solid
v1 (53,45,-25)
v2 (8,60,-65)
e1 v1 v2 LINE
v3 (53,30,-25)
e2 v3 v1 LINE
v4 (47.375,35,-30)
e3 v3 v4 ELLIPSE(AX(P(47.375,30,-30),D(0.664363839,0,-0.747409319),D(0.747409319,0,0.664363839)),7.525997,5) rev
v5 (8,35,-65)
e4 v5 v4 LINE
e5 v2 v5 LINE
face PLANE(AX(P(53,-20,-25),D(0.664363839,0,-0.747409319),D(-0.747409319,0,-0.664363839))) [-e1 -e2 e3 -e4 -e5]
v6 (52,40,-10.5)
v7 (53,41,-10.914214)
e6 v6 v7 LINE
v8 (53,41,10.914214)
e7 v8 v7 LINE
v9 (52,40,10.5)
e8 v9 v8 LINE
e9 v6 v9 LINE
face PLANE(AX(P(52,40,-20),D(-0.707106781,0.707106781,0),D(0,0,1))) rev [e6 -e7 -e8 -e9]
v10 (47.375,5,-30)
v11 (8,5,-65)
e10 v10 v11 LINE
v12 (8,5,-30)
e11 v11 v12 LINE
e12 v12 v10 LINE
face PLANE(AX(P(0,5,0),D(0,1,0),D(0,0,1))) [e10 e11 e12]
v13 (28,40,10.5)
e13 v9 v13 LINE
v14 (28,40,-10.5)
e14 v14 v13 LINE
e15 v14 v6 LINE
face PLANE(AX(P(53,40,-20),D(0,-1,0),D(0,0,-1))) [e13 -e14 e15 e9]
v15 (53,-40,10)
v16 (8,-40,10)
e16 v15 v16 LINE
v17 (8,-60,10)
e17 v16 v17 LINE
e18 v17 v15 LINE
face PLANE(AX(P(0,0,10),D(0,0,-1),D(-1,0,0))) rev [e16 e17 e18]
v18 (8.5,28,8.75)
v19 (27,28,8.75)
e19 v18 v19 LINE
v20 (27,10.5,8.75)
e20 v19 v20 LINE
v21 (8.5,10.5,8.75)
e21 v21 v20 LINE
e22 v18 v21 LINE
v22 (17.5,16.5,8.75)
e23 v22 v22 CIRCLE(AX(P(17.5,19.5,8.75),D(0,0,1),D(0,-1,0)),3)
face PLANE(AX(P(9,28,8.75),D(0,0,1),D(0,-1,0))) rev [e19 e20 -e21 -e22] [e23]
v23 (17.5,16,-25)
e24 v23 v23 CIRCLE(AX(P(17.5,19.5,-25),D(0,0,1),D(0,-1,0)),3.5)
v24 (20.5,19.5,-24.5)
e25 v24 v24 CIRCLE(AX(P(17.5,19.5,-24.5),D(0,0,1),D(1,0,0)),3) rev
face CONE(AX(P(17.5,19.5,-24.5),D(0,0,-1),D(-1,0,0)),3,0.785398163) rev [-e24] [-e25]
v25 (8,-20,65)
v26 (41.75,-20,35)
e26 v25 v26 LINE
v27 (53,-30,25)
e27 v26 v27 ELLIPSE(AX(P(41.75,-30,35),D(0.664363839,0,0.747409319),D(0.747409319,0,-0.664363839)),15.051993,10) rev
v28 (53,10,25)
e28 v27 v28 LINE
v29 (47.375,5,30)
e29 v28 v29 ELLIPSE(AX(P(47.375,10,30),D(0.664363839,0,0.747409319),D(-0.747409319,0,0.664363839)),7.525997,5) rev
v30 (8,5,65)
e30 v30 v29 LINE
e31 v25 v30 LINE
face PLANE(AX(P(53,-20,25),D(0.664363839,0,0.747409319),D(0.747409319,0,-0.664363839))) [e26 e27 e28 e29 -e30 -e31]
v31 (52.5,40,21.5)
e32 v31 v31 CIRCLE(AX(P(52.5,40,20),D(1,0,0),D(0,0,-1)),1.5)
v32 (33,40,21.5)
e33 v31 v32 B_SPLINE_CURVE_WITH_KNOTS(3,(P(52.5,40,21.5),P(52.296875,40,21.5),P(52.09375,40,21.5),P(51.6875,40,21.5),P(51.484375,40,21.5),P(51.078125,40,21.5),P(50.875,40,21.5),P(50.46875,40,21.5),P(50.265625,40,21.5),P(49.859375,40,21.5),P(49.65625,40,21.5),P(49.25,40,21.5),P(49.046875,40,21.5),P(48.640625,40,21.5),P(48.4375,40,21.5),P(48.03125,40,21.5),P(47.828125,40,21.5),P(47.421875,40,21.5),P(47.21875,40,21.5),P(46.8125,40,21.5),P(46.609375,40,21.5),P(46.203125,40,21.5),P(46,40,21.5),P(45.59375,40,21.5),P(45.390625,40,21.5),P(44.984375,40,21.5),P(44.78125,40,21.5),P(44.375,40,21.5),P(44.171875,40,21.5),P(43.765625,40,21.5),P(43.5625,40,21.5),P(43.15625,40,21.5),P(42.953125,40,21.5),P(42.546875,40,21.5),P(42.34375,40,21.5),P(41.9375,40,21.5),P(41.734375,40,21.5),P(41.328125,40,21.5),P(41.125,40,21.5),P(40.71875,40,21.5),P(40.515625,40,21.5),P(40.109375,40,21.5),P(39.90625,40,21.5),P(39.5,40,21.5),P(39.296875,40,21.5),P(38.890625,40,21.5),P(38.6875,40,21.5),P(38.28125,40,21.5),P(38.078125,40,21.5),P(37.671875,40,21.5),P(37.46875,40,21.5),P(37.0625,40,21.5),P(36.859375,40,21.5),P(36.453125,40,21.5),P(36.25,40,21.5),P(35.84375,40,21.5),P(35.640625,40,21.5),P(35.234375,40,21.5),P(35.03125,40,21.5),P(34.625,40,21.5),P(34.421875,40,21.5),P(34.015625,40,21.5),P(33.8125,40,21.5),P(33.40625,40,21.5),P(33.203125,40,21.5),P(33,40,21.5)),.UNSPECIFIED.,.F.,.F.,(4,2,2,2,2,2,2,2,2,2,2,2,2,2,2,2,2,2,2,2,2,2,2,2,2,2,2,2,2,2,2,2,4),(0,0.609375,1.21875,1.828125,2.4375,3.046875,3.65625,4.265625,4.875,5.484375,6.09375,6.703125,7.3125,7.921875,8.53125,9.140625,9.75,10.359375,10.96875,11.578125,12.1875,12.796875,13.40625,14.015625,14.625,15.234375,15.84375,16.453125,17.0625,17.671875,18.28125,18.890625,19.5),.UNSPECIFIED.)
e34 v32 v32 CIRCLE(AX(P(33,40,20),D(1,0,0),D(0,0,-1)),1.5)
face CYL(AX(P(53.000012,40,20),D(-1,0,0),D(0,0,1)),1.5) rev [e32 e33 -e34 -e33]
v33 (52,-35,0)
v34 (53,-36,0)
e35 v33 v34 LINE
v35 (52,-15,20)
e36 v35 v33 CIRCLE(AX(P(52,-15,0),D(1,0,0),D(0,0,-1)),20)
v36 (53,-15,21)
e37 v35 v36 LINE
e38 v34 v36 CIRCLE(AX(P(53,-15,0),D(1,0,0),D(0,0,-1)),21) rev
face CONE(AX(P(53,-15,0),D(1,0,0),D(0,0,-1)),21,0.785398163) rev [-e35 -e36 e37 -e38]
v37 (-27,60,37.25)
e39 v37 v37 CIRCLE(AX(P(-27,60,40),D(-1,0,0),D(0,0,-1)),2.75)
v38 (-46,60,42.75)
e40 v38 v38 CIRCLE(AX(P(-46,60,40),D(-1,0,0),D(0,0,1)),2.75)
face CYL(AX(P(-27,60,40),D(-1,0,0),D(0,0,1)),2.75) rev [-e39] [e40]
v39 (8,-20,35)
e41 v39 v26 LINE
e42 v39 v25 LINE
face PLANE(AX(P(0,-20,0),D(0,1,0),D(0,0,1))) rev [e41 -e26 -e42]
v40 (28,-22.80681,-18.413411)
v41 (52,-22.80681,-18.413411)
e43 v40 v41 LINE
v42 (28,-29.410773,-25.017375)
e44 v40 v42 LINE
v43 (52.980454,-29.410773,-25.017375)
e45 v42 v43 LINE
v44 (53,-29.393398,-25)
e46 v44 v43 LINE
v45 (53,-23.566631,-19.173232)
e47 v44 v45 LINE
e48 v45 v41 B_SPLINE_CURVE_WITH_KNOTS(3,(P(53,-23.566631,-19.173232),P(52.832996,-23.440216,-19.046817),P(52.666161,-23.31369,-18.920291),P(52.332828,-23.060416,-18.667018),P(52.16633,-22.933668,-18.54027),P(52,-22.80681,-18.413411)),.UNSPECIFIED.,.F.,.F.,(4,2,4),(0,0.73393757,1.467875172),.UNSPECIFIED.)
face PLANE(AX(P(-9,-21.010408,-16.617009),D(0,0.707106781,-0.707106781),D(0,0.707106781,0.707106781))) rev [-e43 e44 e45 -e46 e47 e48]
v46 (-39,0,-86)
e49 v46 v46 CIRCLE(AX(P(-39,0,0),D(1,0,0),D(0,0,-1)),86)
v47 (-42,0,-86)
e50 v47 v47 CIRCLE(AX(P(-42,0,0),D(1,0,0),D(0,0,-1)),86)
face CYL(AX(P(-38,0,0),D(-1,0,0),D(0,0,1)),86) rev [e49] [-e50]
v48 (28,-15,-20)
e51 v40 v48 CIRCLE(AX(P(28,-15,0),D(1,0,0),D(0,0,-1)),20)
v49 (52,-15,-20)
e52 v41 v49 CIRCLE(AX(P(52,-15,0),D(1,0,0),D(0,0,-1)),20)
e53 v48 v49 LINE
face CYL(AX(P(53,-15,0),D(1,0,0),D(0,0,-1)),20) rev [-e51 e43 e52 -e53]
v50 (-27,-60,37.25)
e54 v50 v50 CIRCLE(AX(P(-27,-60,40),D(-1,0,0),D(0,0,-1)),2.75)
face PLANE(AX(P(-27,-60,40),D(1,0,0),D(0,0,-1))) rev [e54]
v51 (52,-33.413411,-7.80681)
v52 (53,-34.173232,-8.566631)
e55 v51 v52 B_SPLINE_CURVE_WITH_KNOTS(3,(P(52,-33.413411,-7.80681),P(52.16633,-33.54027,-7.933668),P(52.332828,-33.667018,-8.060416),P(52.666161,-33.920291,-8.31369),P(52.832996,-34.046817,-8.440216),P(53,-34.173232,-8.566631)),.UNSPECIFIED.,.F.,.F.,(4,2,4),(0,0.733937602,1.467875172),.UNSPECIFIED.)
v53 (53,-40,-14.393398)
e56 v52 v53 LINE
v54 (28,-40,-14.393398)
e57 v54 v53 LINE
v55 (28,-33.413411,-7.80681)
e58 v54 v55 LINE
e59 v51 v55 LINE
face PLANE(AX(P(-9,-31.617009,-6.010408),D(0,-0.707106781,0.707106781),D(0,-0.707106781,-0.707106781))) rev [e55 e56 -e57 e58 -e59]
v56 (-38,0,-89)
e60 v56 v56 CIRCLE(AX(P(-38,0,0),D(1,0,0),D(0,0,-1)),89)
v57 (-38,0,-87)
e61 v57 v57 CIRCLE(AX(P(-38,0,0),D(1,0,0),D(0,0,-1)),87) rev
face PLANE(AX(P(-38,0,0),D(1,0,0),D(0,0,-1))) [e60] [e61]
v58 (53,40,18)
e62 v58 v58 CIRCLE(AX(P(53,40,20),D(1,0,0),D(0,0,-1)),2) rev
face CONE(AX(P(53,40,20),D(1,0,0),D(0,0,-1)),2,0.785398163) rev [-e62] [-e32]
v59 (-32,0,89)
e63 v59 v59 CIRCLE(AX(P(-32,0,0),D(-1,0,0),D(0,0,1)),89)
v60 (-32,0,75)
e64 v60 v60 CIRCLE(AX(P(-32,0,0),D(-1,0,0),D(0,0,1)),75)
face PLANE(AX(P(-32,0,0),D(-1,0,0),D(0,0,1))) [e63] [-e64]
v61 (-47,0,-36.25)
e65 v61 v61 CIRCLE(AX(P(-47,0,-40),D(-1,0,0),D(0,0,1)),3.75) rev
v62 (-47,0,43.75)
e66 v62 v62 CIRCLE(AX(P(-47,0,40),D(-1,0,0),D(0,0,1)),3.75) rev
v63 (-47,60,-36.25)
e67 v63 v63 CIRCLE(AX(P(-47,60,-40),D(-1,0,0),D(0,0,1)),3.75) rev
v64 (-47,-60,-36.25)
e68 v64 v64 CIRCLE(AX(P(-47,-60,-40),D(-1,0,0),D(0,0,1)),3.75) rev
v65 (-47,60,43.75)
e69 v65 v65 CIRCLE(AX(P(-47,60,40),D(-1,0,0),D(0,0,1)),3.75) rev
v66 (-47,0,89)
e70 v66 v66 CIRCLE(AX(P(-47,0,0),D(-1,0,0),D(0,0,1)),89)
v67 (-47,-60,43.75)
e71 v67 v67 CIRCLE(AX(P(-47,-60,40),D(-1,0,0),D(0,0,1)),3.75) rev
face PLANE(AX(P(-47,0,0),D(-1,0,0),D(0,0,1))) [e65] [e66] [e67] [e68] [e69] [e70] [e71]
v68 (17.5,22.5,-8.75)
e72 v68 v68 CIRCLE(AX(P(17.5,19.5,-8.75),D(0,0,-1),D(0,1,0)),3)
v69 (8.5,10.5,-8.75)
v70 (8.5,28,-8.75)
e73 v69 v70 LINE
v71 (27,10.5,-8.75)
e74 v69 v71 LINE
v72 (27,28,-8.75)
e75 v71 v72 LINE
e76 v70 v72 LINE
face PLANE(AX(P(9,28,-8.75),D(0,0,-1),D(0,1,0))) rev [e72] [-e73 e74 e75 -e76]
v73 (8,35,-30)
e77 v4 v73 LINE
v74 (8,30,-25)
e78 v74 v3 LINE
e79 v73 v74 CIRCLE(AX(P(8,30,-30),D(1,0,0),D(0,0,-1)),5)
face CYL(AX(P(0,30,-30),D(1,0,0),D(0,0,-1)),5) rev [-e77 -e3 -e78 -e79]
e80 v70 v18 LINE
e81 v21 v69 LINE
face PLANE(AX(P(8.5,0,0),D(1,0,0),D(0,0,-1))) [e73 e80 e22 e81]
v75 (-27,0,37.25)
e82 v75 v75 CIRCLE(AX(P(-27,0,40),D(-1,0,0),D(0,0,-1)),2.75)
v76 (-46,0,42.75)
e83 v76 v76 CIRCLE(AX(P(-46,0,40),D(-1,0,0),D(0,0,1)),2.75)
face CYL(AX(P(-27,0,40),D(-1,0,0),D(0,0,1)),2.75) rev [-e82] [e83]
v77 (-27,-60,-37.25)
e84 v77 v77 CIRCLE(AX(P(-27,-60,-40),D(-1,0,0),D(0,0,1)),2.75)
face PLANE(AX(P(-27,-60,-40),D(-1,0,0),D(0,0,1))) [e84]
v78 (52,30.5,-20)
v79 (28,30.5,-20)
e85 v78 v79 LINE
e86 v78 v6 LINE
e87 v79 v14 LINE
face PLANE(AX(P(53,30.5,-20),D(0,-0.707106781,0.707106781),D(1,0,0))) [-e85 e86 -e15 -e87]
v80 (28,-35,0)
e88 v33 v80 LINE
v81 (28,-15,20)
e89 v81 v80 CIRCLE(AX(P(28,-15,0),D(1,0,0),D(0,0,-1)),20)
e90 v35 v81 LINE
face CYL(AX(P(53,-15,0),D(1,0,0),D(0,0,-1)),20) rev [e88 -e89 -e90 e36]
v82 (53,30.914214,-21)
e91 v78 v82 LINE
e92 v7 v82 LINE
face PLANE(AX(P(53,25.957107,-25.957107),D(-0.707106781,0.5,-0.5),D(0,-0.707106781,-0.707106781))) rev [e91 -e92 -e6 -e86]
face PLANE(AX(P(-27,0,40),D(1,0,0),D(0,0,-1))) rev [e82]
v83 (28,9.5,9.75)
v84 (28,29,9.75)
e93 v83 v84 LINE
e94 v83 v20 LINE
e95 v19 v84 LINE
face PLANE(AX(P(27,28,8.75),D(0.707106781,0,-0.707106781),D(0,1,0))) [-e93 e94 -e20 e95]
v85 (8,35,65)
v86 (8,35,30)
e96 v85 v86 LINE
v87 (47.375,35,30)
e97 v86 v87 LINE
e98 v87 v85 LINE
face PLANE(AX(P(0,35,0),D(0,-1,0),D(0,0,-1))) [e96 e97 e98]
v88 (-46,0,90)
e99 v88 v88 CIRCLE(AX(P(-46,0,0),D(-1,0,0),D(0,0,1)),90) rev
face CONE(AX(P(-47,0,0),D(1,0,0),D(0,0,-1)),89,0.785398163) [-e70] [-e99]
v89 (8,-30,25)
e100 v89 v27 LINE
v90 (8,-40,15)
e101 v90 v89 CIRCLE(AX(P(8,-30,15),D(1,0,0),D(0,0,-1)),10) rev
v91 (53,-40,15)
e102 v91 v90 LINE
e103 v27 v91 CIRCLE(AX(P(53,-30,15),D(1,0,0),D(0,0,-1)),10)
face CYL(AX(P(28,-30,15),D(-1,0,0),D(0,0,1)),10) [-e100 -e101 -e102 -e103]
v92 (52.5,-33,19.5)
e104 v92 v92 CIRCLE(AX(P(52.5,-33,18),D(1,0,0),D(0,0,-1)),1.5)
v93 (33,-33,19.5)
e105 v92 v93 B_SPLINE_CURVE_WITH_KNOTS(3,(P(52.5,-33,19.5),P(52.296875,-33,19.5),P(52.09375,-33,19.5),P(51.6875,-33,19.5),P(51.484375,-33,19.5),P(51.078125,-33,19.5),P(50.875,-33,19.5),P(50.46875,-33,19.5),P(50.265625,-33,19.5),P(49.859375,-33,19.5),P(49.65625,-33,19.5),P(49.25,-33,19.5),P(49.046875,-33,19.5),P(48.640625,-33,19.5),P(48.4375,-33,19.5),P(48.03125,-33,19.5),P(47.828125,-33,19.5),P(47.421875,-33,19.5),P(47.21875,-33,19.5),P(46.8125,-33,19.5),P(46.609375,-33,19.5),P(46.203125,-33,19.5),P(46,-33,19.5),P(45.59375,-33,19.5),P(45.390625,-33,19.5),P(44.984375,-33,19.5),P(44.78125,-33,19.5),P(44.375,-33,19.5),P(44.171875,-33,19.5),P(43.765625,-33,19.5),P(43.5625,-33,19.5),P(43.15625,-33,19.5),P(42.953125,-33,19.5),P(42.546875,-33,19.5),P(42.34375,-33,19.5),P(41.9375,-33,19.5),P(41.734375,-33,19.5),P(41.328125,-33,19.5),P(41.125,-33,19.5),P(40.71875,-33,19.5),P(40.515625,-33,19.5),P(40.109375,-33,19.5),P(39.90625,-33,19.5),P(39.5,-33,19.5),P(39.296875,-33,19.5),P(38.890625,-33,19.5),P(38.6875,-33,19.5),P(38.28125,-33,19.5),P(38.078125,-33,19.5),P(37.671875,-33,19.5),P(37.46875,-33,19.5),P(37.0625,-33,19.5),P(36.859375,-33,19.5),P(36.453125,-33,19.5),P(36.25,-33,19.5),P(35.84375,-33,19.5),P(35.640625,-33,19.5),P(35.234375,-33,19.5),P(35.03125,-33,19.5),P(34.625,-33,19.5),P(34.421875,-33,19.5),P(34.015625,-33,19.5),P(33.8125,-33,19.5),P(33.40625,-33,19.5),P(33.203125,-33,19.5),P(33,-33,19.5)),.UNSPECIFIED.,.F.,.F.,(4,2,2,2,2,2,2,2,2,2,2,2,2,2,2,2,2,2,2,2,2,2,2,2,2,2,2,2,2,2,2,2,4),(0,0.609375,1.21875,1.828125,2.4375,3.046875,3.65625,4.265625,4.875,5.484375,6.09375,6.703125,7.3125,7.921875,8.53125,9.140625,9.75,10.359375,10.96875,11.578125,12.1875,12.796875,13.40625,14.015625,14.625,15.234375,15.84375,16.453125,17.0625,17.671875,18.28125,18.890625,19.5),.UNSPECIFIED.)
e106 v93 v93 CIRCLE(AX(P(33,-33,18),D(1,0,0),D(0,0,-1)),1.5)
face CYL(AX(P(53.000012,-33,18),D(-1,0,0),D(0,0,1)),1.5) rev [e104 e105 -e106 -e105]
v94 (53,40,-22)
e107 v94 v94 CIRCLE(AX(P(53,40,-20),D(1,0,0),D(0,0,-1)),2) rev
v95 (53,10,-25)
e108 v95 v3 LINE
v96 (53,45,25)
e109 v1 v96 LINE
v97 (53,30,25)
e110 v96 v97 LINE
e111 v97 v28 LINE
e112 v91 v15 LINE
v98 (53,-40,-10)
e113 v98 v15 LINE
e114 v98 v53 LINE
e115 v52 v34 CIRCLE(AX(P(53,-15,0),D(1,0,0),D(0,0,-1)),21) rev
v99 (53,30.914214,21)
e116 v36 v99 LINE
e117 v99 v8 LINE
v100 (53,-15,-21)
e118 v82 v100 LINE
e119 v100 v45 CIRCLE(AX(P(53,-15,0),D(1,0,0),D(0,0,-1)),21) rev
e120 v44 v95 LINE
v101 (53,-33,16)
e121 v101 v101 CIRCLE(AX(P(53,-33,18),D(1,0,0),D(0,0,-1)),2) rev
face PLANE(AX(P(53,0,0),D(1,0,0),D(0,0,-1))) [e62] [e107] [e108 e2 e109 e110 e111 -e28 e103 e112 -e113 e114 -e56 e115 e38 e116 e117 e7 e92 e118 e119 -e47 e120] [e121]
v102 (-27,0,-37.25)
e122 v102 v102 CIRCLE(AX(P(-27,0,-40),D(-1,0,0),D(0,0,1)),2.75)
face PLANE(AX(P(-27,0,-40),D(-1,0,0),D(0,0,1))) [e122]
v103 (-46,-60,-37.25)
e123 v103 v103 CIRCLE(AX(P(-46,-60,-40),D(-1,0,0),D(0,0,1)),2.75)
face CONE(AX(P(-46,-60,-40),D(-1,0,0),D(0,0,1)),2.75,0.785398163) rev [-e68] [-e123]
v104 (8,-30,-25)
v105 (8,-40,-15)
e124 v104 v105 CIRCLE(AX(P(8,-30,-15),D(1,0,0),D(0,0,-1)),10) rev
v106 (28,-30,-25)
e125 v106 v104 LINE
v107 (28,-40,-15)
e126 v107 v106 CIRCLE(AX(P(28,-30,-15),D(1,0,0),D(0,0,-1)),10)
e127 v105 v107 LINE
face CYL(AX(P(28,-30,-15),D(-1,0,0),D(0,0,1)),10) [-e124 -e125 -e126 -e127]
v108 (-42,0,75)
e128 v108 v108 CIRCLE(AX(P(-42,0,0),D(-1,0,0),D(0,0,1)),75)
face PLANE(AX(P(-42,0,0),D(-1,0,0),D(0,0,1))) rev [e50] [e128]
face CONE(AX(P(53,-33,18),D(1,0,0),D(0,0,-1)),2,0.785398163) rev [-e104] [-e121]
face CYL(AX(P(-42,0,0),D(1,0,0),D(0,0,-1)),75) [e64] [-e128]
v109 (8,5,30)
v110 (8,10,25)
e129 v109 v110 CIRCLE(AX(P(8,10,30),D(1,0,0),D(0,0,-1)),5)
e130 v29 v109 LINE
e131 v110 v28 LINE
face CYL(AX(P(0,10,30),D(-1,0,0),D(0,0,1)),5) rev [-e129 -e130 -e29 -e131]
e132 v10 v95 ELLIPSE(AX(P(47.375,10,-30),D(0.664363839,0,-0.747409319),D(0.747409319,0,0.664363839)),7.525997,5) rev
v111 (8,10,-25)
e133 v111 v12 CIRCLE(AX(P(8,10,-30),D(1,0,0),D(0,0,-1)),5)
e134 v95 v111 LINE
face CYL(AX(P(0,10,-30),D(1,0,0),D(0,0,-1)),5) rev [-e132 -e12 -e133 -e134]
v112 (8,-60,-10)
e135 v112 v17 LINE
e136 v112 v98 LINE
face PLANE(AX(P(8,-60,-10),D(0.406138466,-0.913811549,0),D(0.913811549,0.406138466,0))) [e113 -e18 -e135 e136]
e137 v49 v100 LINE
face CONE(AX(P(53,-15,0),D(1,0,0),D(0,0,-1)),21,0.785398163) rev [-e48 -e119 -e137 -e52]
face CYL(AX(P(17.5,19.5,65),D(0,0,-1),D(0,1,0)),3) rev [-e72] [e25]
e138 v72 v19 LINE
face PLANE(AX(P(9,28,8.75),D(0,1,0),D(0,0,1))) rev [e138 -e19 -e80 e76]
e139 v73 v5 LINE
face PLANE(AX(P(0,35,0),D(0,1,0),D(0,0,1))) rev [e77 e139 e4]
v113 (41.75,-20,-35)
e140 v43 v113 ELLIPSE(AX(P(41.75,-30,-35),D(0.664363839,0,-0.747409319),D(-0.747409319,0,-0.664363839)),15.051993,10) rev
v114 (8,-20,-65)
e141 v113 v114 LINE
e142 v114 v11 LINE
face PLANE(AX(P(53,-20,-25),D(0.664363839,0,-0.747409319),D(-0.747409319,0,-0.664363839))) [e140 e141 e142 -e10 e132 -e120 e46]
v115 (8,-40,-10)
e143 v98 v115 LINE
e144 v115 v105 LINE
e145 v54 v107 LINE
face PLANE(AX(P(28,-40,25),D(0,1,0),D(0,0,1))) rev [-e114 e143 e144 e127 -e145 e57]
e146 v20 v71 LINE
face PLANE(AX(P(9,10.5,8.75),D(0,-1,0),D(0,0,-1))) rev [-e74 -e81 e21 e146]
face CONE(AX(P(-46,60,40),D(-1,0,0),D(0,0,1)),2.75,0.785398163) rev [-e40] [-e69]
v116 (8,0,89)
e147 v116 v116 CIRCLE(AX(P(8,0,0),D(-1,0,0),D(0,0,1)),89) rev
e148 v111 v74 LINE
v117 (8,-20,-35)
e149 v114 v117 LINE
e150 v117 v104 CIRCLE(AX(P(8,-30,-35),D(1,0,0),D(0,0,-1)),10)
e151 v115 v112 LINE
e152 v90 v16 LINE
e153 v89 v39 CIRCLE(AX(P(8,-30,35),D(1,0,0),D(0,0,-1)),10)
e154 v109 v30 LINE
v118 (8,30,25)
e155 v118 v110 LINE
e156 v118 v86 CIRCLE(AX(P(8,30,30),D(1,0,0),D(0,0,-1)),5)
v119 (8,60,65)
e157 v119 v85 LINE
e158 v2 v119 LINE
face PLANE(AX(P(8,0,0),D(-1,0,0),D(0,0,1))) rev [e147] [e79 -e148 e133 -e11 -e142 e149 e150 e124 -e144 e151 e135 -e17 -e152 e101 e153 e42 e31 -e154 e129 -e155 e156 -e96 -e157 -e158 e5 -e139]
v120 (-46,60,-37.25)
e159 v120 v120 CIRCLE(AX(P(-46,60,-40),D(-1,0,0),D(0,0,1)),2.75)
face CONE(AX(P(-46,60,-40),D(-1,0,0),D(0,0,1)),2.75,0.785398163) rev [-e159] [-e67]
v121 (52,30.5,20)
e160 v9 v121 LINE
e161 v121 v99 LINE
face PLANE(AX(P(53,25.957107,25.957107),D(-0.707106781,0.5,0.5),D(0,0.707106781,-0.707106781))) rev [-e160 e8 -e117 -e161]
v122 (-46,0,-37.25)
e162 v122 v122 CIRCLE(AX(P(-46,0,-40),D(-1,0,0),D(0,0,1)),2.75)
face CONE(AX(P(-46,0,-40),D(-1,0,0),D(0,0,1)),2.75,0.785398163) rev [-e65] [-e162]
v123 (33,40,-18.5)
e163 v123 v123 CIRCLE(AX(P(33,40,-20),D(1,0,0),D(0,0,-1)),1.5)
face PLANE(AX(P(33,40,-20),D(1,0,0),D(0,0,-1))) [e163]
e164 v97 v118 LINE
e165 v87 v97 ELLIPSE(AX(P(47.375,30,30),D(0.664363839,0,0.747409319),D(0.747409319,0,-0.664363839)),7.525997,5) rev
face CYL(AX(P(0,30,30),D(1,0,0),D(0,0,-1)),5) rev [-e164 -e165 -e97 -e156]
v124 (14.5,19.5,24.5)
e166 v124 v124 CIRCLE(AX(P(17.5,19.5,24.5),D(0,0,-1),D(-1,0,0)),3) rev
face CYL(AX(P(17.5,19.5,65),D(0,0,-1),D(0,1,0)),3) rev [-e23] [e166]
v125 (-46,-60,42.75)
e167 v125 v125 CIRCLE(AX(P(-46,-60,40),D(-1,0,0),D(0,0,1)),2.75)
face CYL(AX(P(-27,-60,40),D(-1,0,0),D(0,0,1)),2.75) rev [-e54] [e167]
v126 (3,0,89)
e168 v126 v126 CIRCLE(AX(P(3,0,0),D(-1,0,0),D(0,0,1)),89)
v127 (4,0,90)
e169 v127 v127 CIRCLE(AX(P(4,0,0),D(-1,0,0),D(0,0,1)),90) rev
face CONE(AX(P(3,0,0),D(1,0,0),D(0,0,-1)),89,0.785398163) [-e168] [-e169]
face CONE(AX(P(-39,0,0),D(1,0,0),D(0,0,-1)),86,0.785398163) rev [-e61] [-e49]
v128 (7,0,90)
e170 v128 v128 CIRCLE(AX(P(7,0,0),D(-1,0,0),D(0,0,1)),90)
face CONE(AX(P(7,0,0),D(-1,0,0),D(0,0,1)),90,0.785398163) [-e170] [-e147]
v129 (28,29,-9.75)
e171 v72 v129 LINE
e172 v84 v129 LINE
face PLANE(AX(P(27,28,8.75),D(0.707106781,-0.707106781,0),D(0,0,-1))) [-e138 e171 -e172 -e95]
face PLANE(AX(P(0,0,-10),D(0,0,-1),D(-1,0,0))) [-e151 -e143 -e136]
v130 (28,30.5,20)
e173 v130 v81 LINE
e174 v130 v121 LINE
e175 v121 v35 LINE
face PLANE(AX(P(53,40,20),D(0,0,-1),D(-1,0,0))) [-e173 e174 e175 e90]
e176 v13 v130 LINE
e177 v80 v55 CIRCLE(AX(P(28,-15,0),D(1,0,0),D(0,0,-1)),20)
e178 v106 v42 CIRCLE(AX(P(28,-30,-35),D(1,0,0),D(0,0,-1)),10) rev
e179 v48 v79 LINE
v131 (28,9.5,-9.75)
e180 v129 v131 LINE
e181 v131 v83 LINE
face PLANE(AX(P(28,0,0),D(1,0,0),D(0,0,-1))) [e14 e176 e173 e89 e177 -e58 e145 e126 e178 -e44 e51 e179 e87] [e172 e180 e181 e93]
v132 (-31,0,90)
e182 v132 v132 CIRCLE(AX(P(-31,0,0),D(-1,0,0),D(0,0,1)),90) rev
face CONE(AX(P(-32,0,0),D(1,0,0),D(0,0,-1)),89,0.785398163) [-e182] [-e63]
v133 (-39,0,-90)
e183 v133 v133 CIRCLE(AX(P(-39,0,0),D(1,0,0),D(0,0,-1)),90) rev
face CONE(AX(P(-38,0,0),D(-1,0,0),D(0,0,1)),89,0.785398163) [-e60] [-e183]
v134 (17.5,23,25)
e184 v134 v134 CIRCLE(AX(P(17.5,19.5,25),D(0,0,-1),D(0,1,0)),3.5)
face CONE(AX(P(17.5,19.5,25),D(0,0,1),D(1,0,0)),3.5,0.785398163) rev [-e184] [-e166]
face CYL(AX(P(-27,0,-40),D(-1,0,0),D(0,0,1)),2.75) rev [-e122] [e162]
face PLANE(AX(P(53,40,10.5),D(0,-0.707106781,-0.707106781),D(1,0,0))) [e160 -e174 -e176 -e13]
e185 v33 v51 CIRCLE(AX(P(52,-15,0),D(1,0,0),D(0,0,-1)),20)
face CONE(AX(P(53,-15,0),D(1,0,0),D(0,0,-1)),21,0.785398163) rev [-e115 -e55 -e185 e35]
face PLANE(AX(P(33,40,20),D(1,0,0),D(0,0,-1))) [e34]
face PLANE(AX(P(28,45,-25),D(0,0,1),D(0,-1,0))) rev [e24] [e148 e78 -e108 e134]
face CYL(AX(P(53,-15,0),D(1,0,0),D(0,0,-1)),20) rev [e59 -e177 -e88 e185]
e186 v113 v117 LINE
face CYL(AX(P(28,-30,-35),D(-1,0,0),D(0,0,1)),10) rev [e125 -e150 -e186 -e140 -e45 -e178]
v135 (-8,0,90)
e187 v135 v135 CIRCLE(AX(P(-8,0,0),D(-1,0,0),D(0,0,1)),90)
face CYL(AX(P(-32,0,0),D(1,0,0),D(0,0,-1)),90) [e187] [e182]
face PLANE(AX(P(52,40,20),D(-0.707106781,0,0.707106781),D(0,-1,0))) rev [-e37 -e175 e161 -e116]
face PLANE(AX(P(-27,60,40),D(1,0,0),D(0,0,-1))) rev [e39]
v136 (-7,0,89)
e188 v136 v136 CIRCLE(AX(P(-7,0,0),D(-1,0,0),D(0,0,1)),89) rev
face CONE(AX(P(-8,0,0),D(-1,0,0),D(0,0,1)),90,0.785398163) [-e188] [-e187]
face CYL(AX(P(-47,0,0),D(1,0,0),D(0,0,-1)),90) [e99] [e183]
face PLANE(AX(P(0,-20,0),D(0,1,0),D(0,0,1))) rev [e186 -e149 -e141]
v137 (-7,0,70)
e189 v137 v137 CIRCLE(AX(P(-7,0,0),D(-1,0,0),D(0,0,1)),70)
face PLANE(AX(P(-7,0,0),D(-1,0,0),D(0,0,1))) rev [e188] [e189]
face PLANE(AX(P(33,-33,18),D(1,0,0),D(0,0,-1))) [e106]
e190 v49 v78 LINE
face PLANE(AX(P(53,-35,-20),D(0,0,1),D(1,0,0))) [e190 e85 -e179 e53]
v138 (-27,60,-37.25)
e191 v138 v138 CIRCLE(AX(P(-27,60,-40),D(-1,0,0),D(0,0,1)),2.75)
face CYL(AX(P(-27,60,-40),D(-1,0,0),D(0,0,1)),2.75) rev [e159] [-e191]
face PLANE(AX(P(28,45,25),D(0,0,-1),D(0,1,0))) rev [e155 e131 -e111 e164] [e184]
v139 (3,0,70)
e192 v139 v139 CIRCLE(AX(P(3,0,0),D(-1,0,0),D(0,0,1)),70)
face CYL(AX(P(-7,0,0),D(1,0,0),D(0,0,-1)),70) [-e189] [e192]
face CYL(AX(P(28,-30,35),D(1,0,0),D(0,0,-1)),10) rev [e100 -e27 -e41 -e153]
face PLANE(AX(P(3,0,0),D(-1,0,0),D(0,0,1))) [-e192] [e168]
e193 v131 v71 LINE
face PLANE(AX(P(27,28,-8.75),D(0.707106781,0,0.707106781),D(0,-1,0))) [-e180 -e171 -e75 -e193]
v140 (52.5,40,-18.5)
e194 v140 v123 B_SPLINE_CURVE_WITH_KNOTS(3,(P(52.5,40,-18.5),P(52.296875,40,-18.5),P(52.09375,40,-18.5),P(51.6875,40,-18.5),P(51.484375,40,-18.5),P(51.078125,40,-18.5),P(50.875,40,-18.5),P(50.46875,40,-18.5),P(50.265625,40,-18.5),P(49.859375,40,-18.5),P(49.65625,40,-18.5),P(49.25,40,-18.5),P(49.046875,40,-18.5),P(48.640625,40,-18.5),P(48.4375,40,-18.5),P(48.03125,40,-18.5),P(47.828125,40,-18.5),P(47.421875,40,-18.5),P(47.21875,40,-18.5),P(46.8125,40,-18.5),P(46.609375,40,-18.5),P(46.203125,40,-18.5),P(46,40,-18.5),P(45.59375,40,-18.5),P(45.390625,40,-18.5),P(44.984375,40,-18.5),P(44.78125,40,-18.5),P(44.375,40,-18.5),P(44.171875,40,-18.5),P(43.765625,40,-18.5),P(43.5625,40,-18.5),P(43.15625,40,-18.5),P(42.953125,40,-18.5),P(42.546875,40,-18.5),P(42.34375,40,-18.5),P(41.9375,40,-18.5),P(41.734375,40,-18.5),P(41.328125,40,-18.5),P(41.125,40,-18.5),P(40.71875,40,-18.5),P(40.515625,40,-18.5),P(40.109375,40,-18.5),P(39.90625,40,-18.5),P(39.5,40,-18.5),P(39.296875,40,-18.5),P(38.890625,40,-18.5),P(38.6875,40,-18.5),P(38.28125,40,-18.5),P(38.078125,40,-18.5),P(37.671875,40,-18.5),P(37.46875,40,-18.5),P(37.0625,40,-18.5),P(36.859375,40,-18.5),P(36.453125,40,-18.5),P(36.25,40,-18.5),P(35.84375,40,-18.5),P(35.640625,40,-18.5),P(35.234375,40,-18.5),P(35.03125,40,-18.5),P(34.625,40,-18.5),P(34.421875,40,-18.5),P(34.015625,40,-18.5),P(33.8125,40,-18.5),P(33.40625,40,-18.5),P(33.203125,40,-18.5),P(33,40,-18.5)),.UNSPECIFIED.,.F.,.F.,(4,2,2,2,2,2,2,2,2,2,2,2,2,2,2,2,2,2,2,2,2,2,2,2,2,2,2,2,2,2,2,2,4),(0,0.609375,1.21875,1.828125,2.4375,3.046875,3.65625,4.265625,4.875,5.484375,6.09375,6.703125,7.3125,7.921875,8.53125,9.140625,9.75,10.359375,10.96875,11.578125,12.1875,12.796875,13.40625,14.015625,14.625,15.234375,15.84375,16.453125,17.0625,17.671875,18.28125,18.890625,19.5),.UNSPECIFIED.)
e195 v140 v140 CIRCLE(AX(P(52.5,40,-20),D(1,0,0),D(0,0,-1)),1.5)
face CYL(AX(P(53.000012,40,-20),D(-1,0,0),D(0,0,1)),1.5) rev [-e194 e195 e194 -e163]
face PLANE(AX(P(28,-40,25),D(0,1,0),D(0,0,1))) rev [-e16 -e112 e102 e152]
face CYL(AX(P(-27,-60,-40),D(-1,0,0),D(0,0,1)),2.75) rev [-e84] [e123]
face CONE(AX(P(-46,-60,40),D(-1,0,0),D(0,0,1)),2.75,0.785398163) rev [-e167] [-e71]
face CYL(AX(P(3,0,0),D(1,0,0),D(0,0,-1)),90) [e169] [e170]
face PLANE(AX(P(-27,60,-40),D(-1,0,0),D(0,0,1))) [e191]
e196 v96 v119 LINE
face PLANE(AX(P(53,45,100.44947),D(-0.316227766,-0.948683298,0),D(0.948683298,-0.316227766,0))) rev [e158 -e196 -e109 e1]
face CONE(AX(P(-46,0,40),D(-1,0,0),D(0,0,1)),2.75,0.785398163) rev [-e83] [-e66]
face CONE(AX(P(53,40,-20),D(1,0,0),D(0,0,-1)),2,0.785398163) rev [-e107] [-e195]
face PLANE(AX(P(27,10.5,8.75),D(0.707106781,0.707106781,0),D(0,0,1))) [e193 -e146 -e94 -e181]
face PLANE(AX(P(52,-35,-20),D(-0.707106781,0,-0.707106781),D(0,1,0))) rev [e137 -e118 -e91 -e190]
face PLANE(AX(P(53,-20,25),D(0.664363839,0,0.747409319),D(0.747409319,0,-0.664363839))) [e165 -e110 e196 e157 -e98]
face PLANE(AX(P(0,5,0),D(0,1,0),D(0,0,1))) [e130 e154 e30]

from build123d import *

# Parameters (mm, degrees)
SKETCH_1_W                  = 130
SKETCH_1_H                  = 120
EXTRUDE_1_DEPTH             = 8
SKETCH_3_W                  = 50
SKETCH_3_H                  = 85
EXTRUDE_2_DEPTH             = 20
SKETCH_4_W                  = 17.5
SKETCH_4_H                  = 17.5
CUT_EXTRUDE_1_DEPTH         = 19
SKETCH_5_R                  = 3
CUT_EXTRUDE_2_DEPTH         = 112.731821788
SKETCH_6_W                  = 50
SKETCH_6_H                  = 85
SKETCH_6_W_2                = 40
SKETCH_6_H_2                = 75
EXTRUDE_3_DEPTH             = 25
CHAMFER_1_SIZE              = 9.5
FILLET_1_R                  = 20
CUT_EXTRUDE_3_DEPTH         = 104.121287812
CUT_EXTRUDE_3_DEPTH_BACK    = 25
CHAMFER_2_SIZE              = 1
CHAMFER_3_SIZE              = 1
EXTRUDE_START               = -40
EXTRUDE_4_DEPTH             = 25
EXTRUDE_5_REACH             = 105.121
EXTRUDE_5_DIRECTION_2_REACH = 105.121
EXTRUDE_6_DEPTH             = 10
EXTRUDE_6_DEPTH_BACK        = 10
FILLET_2_R                  = 10
CUT_EXTRUDE_4_DEPTH         = 104.121287812
CUT_EXTRUDE_4_DEPTH_BACK    = 20
SKETCH_11_R                 = 1.5
CHAMFER_4_SIZE              = 0.5
SKETCH_13_W                 = 150
SKETCH_13_H                 = 220
SKETCH_13_W_2               = 130
SKETCH_13_H_2               = 120
EXTRUDE_7_DEPTH             = 8
FILLET_4_R                  = 10
SKETCH_15_R                 = 2.75
CUT_EXTRUDE_6_DEPTH         = 141.534693226
FILLET_5_R                  = 4
EXTRUDE_8_DEPTH             = 10
FILLET_6_R                  = 5
CHAMFER_5_SIZE              = 0.5
CUT_EXTRUDE_START           = -8
CUT_EXTRUDE_7_DEPTH         = 8
SKETCH_18_R                 = 90
EXTRUDE_9_DEPTH             = 5
SKETCH_19_R                 = 70
EXTRUDE_10_DEPTH            = 10
SKETCH_20_R                 = 90
EXTRUDE_11_DEPTH            = 25
SKETCH_24_R                 = 75
EXTRUDE_14_DEPTH            = 10
SKETCH_25_R                 = 90
EXTRUDE_15_DEPTH            = 5
EXTRUDE_START_2             = 4
SKETCH_26_R                 = 90
SKETCH_26_R_2               = 86
EXTRUDE_16_DEPTH            = 4
SKETCH_27_R                 = 2.75
CUT_EXTRUDE_8_DEPTH         = 20
CHAMFER_6_SIZE              = 1
CHAMFER_7_SIZE              = 1
SKETCH_28_W                 = 17.5
SKETCH_28_H                 = 17.5
CUT_EXTRUDE_9_DEPTH         = 0.5


# Some blends are built 0.0001 mm under size
with BuildPart() as part:
    # 草图1 → 凸台-拉伸1 (new body)
    with BuildSketch(Plane(origin=(0, 0, 0), x_dir=(0, 0, -1), z_dir=(1, 0, 0))):
        Rectangle(SKETCH_1_W, SKETCH_1_H)
    extrude(amount=EXTRUDE_1_DEPTH)

    # 草图3 → 凸台-拉伸2 (add)
    with BuildSketch(Plane(origin=(8, 0, 0), x_dir=(0, 0, -1), z_dir=(1, 0, 0))):
        with Locations((0, 2.5)):
            Rectangle(SKETCH_3_W, SKETCH_3_H)
    extrude(amount=EXTRUDE_2_DEPTH)

    # 草图4 → 切除-拉伸1 (cut)
    with BuildSketch(Plane(origin=(28, 0, 0), x_dir=(0, 0, -1), z_dir=(1, 0, 0))):
        with Locations((0, 19.25)):
            Rectangle(SKETCH_4_W, SKETCH_4_H)
    extrude(amount=-CUT_EXTRUDE_1_DEPTH, mode=Mode.SUBTRACT)

    # 草图5 → 切除-拉伸2 (cut, through all)
    with BuildSketch(Plane(origin=(0, 0, -25), x_dir=(-1, 0, 0), z_dir=(0, 0, -1))):
        with Locations(Location((-17.5, 19.5, 0), (0, 0, 90))):
            Circle(SKETCH_5_R)
    extrude(amount=-CUT_EXTRUDE_2_DEPTH, mode=Mode.SUBTRACT)

    # 草图6 → 凸台-拉伸3 (add)
    with BuildSketch(Plane(origin=(28, 0, 0), x_dir=(0, 0, -1), z_dir=(1, 0, 0))):
        with Locations((0, 2.5)):
            Rectangle(SKETCH_6_W, SKETCH_6_H)
        with Locations((0, 2.5)):
            Rectangle(SKETCH_6_W_2, SKETCH_6_H_2, mode=Mode.SUBTRACT)
    extrude(amount=EXTRUDE_3_DEPTH)

    # 倒角1
    chamfer_1_edges = [part.edges().sort_by_distance(p)[0] for p in [
        (40.5, 40, 20),
        (40.5, 40, -20),
    ]]
    chamfer(chamfer_1_edges, length=CHAMFER_1_SIZE)

    # 圆角1
    fillet_1_edges = [part.edges().sort_by_distance(p)[0] for p in [
        (40.5, -35, 20),
        (40.5, -35, -20),
    ]]
    fillet(fillet_1_edges, radius=FILLET_1_R - 0.0001)  # a hair under: the kernel refuses the full size

    # 草图7 → 切除-拉伸3 (cut, two sides: drawn at the far end of the back side and taken through both)
    with BuildSketch(Plane(origin=(53, 0, 0), x_dir=(0, 0, -1), z_dir=(1, 0, 0)).offset(-CUT_EXTRUDE_3_DEPTH_BACK)):
        Polygon((6.01040764, -31.617009358), (16.617009358, -21.01040764), (32.173358544, -36.566756826), (21.566756826, -47.173358544), align=None)
    extrude(amount=CUT_EXTRUDE_3_DEPTH + CUT_EXTRUDE_3_DEPTH_BACK, mode=Mode.SUBTRACT)

    # 倒角2
    chamfer_2_edges = [part.edges().sort_by_distance(p)[0] for p in [
        (28, 19.25, 8.75),
        (28, 10.5, 0),
        (28, 19.25, -8.75),
        (28, 28, 0),
    ]]
    chamfer(chamfer_2_edges, length=CHAMFER_2_SIZE)

    # 倒角3
    chamfer_3_edges = [part.edges().sort_by_distance(p)[0] for p in [
        (53, -34.599345679, -3.983260659),
        (53, 40, 0),
        (53, 7.74995, 20),
        (53, 35.25, 15.25),
        (53, 35.25, -15.25),
        (53, 7.74995, -20),
        (53, -29.142164913, 14.142164913),
        (53, -18.983260659, -19.599345679),
    ]]
    chamfer(chamfer_3_edges, length=CHAMFER_3_SIZE)

    # 草图8 → 凸台-拉伸4 (add)
    with BuildSketch(Plane(origin=(0, 45, 0), x_dir=(1, 0, 0), z_dir=(0, 1, 0)).offset(EXTRUDE_START)):
        Polygon((53, -25), (8, -65), (8, -25), align=None)
        Polygon((8, 25), (53, 25), (8, 65), align=None)
    extrude(amount=-EXTRUDE_4_DEPTH)

    # 凸台-拉伸5: up to this plane
    extrude_5_end = Plane(origin=(53, -20, 25), z_dir=(0.6643638388299199, 0, 0.7474093186836597))
    # 草图9 → 凸台-拉伸5 (add, up to the surface)
    with BuildSketch(Plane.XY, mode=Mode.PRIVATE) as extrude_5_sk1:
        Polygon((53, 45), (8, 60), (8, 45), align=None)
    extrude_5_tool1 = split(extrude(extrude_5_sk1.sketch, amount=EXTRUDE_5_REACH, mode=Mode.PRIVATE), bisect_by=extrude_5_end, keep=Keep.BOTH, mode=Mode.PRIVATE)
    add(extrude_5_tool1.solids().sort_by_distance((23, 50, 0))[0])

    # 凸台-拉伸5 direction 2: up to this plane
    extrude_5_direction_2_end = Plane(origin=(53, -20, -25), z_dir=(0.6643638388299199, 0, -0.7474093186836597))
    # 草图9 → 凸台-拉伸5 direction 2 (add, up to the surface)
    with BuildSketch(Plane.XY, mode=Mode.PRIVATE) as extrude_5_direction_2_sk1:
        Polygon((53, 45), (8, 60), (8, 45), align=None)
    extrude_5_direction_2_tool1 = split(extrude(extrude_5_direction_2_sk1.sketch, amount=-EXTRUDE_5_DIRECTION_2_REACH, mode=Mode.PRIVATE), bisect_by=extrude_5_direction_2_end, keep=Keep.BOTH, mode=Mode.PRIVATE)
    add(extrude_5_direction_2_tool1.solids().sort_by_distance((23, 50, 0))[0])

    # 草图10 → 凸台-拉伸6 (add, two sides: drawn at the far end of the back side and taken through both)
    with BuildSketch(Plane.XY.offset(-EXTRUDE_6_DEPTH_BACK)):
        Polygon((8, -60), (53, -40), (8, -40), align=None)
    extrude(amount=EXTRUDE_6_DEPTH + EXTRUDE_6_DEPTH_BACK)

    # 圆角2
    fillet_2_edges = [part.edges().sort_by_distance(p)[0] for p in [
        (18, -40, -25),
        (30.5, -40, 25),
    ]]
    fillet(fillet_2_edges, radius=FILLET_2_R)

    # 草图11 → 切除-拉伸4 (cut, two sides: drawn at the far end of the back side and taken through both)
    with BuildSketch(Plane(origin=(53, 0, 0), x_dir=(0, 0, -1), z_dir=(1, 0, 0)).offset(-CUT_EXTRUDE_4_DEPTH_BACK)):
        with Locations(Location((20, 40, 0), (0, 0, 180))):
            Circle(SKETCH_11_R)
        with Locations(Location((-18, -33, 0), (0, 0, 180))):
            Circle(SKETCH_11_R)
        with Locations(Location((-20, 40, 0), (0, 0, 180))):
            Circle(SKETCH_11_R)
    extrude(amount=CUT_EXTRUDE_4_DEPTH + CUT_EXTRUDE_4_DEPTH_BACK, mode=Mode.SUBTRACT)

    # 倒角4
    chamfer_4_edges = [part.edges().sort_by_distance(p)[0] for p in [
        (53, 40, -21.5),
        (53, -33, 16.5),
        (53, 40, 18.5),
    ]]
    chamfer(chamfer_4_edges, length=CHAMFER_4_SIZE)

    # 草图13 → 凸台-拉伸7 (add)
    with BuildSketch(Plane.ZY):
        Rectangle(SKETCH_13_W, SKETCH_13_H)
        Rectangle(SKETCH_13_W_2, SKETCH_13_H_2, mode=Mode.SUBTRACT)
    extrude(amount=-EXTRUDE_7_DEPTH)

    # 圆角4
    # the kernel refuses this fillet: 10 mm, written as the material it adds along each edge
    with BuildSketch(Plane(origin=(8, -20, 25), x_dir=(0, -1, 0), z_dir=(1, 0, 0))) as fillet_4_piece_1_section:
        with BuildLine():
            CenterArc((FILLET_4_R, -FILLET_4_R), FILLET_4_R, 90, 90)
            Line((0, -FILLET_4_R), (0, 0))
            Line((0, 0), (FILLET_4_R, 0))
        make_face()
    fillet_4_piece_1 = extrude(amount=45, mode=Mode.PRIVATE)
    fillet_4_piece_1 = split(fillet_4_piece_1, bisect_by=Plane(origin=(38.692278555, -22.336167514, 37.717974618), z_dir=(-0.6643638388299199, 0, -0.7474093186836597)), keep=Keep.TOP, mode=Mode.PRIVATE)
    add(fillet_4_piece_1)
    with BuildSketch(Plane(origin=(8, -20, -25), x_dir=(0, -1, 0), z_dir=(1, 0, 0))) as fillet_4_piece_2_section:
        with BuildLine():
            CenterArc((FILLET_4_R, FILLET_4_R), FILLET_4_R, 180, 90)
            Line((0, FILLET_4_R), (0, 0))
            Line((0, 0), (FILLET_4_R, 0))
        make_face()
    fillet_4_piece_2 = extrude(amount=45, mode=Mode.PRIVATE)
    fillet_4_piece_2 = split(fillet_4_piece_2, bisect_by=Plane(origin=(28, -29.642059418, -24.897986041), z_dir=(-1, 0, 0)), keep=Keep.TOP, mode=Mode.PRIVATE)
    fillet_4_piece_2 = split(fillet_4_piece_2, bisect_by=Plane(origin=(18, -29.466721871, -25.073323589), z_dir=(0, -0.7071067811865479, 0.7071067811865474)), keep=Keep.TOP, mode=Mode.PRIVATE)
    add(fillet_4_piece_2)
    with BuildSketch(Plane(origin=(8, -20, -25), x_dir=(0, -1, 0), z_dir=(1, 0, 0))) as fillet_4_piece_3_section:
        with BuildLine():
            CenterArc((FILLET_4_R, FILLET_4_R), FILLET_4_R, 180, 90)
            Line((0, FILLET_4_R), (0, 0))
            Line((0, 0), (FILLET_4_R, 0))
        make_face()
    fillet_4_piece_3 = extrude(amount=45, mode=Mode.PRIVATE)
    fillet_4_piece_3 = split(fillet_4_piece_3, bisect_by=Plane(origin=(28, -22.221791928, -27.277470493), z_dir=(-1, 0, 0)), keep=Keep.TOP, mode=Mode.PRIVATE)
    fillet_4_piece_3 = split(fillet_4_piece_3, bisect_by=Plane(origin=(18, -26.946330352, -22.552932069), z_dir=(0, 0.7071067811865479, -0.7071067811865474)), keep=Keep.TOP, mode=Mode.PRIVATE)
    add(fillet_4_piece_3)
    with BuildSketch(Plane(origin=(8, -20, -25), x_dir=(0, -1, 0), z_dir=(1, 0, 0))) as fillet_4_piece_4_section:
        with BuildLine():
            CenterArc((FILLET_4_R, FILLET_4_R), FILLET_4_R, 180, 90)
            Line((0, FILLET_4_R), (0, 0))
            Line((0, 0), (FILLET_4_R, 0))
        make_face()
    fillet_4_piece_4 = extrude(amount=45, mode=Mode.PRIVATE)
    fillet_4_piece_4 = split(fillet_4_piece_4, bisect_by=Plane(origin=(44.356152586, -22.354399004, -32.683419923), z_dir=(-0.6643638388299199, 0, 0.7474093186836597)), keep=Keep.TOP, mode=Mode.PRIVATE)
    fillet_4_piece_4 = split(fillet_4_piece_4, bisect_by=Plane(origin=(28, -22.354399004, -27.045541077), z_dir=(1, 0, 0)), keep=Keep.TOP, mode=Mode.PRIVATE)
    fillet_4_piece_4 = split(fillet_4_piece_4, bisect_by=Plane(origin=(39.344704724, -26.896669182, -22.503270899), z_dir=(0, 0.7071067811865479, -0.7071067811865474)), keep=Keep.TOP, mode=Mode.PRIVATE)
    add(fillet_4_piece_4)

    # 草图15 → 切除-拉伸6 (cut, through all)
    with BuildSketch(Plane(origin=(8, 0, 0), x_dir=(0, 0, -1), z_dir=(1, 0, 0))):
        with Locations((0, 90)):
            Circle(SKETCH_15_R)
        with Locations((50, 90)):
            Circle(SKETCH_15_R)
        with Locations((-50, 90)):
            Circle(SKETCH_15_R)
        with Locations(Location((-50, -90, 0), (0, 0, 180))):
            Circle(SKETCH_15_R)
        with Locations(Location((50, -90, 0), (0, 0, 180))):
            Circle(SKETCH_15_R)
        with Locations(Location((0, -90, 0), (0, 0, 180))):
            Circle(SKETCH_15_R)
    extrude(amount=-CUT_EXTRUDE_6_DEPTH, mode=Mode.SUBTRACT)

    # 圆角5
    fillet_5_edges = [part.edges().sort_by_distance(p)[0] for p in [
        (4, -110, -75),
        (4, 110, -75),
        (4, 110, 75),
        (4, -110, 75),
    ]]
    fillet(fillet_5_edges, radius=FILLET_5_R)

    # 草图16 → 凸台-拉伸8 (add)
    with BuildSketch(Plane.XZ.offset(-45)):
        Polygon((8, -65), (53, -25), (8, -25), align=None)
        Polygon((8, 65), (8, 25), (53, 25), align=None)
    extrude(amount=EXTRUDE_8_DEPTH)

    # 圆角6
    # the kernel refuses this fillet: 5 mm, written as the material it adds along each edge
    with BuildSketch(Plane(origin=(-4.5, 5, 25), x_dir=(0, 0, 1), z_dir=(1, 0, 0))) as fillet_6_piece_1_section:
        with BuildLine():
            CenterArc((FILLET_6_R, -FILLET_6_R), FILLET_6_R, 90, 90)
            Line((0, -FILLET_6_R), (0, 0))
            Line((0, 0), (FILLET_6_R, 0))
        make_face()
    fillet_6_piece_1 = extrude(amount=70, mode=Mode.PRIVATE)
    fillet_6_piece_1 = split(fillet_6_piece_1, bisect_by=Plane(origin=(0, 6.130138069, 26.094234361), z_dir=(1, 0, 0)), keep=Keep.TOP, mode=Mode.PRIVATE)
    fillet_6_piece_1 = split(fillet_6_piece_1, bisect_by=Plane(origin=(39.543855675, 6.130138069, 36.961017178), z_dir=(-0.6643638388297957, 0, -0.74740931868377)), keep=Keep.TOP, mode=Mode.PRIVATE)
    add(fillet_6_piece_1)
    with BuildSketch(Plane(origin=(-4.5, 5, -25), x_dir=(0, 1, 0), z_dir=(1, 0, 0))) as fillet_6_piece_2_section:
        with BuildLine():
            CenterArc((FILLET_6_R, -FILLET_6_R), FILLET_6_R, 90, 90)
            Line((0, -FILLET_6_R), (0, 0))
            Line((0, 0), (FILLET_6_R, 0))
        make_face()
    fillet_6_piece_2 = extrude(amount=70, mode=Mode.PRIVATE)
    fillet_6_piece_2 = split(fillet_6_piece_2, bisect_by=Plane(origin=(0, 6.130138069, -26.094234361), z_dir=(1, 0, 0)), keep=Keep.TOP, mode=Mode.PRIVATE)
    fillet_6_piece_2 = split(fillet_6_piece_2, bisect_by=Plane(origin=(39.543855675, 6.130138069, -36.961017178), z_dir=(-0.6643638388297957, 0, 0.74740931868377)), keep=Keep.TOP, mode=Mode.PRIVATE)
    add(fillet_6_piece_2)
    with BuildSketch(Plane(origin=(65.5, 35, -25), x_dir=(0, 0, -1), z_dir=(-1, 0, 0))) as fillet_6_piece_3_section:
        with BuildLine():
            CenterArc((FILLET_6_R, FILLET_6_R), FILLET_6_R, 180, 90)
            Line((0, FILLET_6_R), (0, 0))
            Line((0, 0), (FILLET_6_R, 0))
        make_face()
    fillet_6_piece_3 = extrude(amount=70, mode=Mode.PRIVATE)
    fillet_6_piece_3 = split(fillet_6_piece_3, bisect_by=Plane(origin=(0, 33.869861931, -26.094234361), z_dir=(1, 0, 0)), keep=Keep.TOP, mode=Mode.PRIVATE)
    fillet_6_piece_3 = split(fillet_6_piece_3, bisect_by=Plane(origin=(39.543855675, 33.869861931, -36.961017178), z_dir=(-0.6643638388299199, 0, 0.7474093186836597)), keep=Keep.TOP, mode=Mode.PRIVATE)
    add(fillet_6_piece_3)
    with BuildSketch(Plane(origin=(-4.5, 35, 25), x_dir=(0, -1, 0), z_dir=(1, 0, 0))) as fillet_6_piece_4_section:
        with BuildLine():
            CenterArc((FILLET_6_R, -FILLET_6_R), FILLET_6_R, 90, 90)
            Line((0, -FILLET_6_R), (0, 0))
            Line((0, 0), (FILLET_6_R, 0))
        make_face()
    fillet_6_piece_4 = extrude(amount=70, mode=Mode.PRIVATE)
    fillet_6_piece_4 = split(fillet_6_piece_4, bisect_by=Plane(origin=(0, 33.869861931, 26.094234361), z_dir=(1, 0, 0)), keep=Keep.TOP, mode=Mode.PRIVATE)
    fillet_6_piece_4 = split(fillet_6_piece_4, bisect_by=Plane(origin=(39.543855675, 33.869861931, 36.961017178), z_dir=(-0.66436383882992, 0, -0.7474093186836596)), keep=Keep.TOP, mode=Mode.PRIVATE)
    add(fillet_6_piece_4)

    # 倒角5
    chamfer_5_edges = [part.edges().sort_by_distance(p)[0] for p in [
        (17.5, 16.5, 25),
        (17.5, 16.5, -25),
    ]]
    chamfer(chamfer_5_edges, length=CHAMFER_5_SIZE)

    # 草图17 → 切除-拉伸7 (cut)
    with BuildSketch(Plane.ZY.offset(CUT_EXTRUDE_START)):
        with BuildLine():
            Line((75, -106), (75, 106))
            ThreePointArc((75, 106), (73.828427125, 108.828427125), (71, 110))
            Line((71, 110), (-71, 110))
            ThreePointArc((-71, 110), (-73.828427125, 108.828427125), (-75, 106))
            Line((-75, 106), (-75, -106))
            ThreePointArc((-75, -106), (-73.828427125, -108.828427125), (-71, -110))
            Line((-71, -110), (71, -110))
            ThreePointArc((71, -110), (73.828427125, -108.828427125), (75, -106))
        make_face()
    extrude(amount=CUT_EXTRUDE_7_DEPTH, mode=Mode.SUBTRACT)

    # 草图18 → 凸台-拉伸9 (add)
    with BuildSketch(Plane.ZY.offset(-8)):
        Circle(SKETCH_18_R)
    extrude(amount=EXTRUDE_9_DEPTH)

    # 草图19 → 凸台-拉伸10 (add)
    with BuildSketch(Plane.ZY.offset(-3)):
        Circle(SKETCH_19_R)
    extrude(amount=EXTRUDE_10_DEPTH)

    # 草图20 → 凸台-拉伸11 (add)
    with BuildSketch(Plane.ZY.offset(7)):
        Circle(SKETCH_20_R)
    extrude(amount=EXTRUDE_11_DEPTH)

    # 草图24 → 凸台-拉伸14 (add)
    with BuildSketch(Plane.ZY.offset(32)):
        Circle(SKETCH_24_R)
    extrude(amount=EXTRUDE_14_DEPTH)

    # 草图25 → 凸台-拉伸15 (add)
    with BuildSketch(Plane.ZY.offset(42)):
        Circle(SKETCH_25_R)
    extrude(amount=EXTRUDE_15_DEPTH)

    # 草图26 → 凸台-拉伸16 (add)
    with BuildSketch(Plane(origin=(-42, 0, 0), x_dir=(0, 0, -1), z_dir=(1, 0, 0)).offset(EXTRUDE_START_2)):
        with Locations(Location((0, 0, 0), (0, 0, 180))):
            Circle(SKETCH_26_R)
        Circle(SKETCH_26_R_2, mode=Mode.SUBTRACT)
    extrude(amount=-EXTRUDE_16_DEPTH)

    # 草图27 → 切除-拉伸8 (cut)
    with BuildSketch(Plane.ZY.offset(47)):
        with Locations((-40, 60)):
            Circle(SKETCH_27_R)
        with Locations((-40, 0)):
            Circle(SKETCH_27_R)
        with Locations((-40, -60)):
            Circle(SKETCH_27_R)
        with Locations(Location((40, -60, 0), (0, 0, 180))):
            Circle(SKETCH_27_R)
        with Locations(Location((40, 0, 0), (0, 0, 180))):
            Circle(SKETCH_27_R)
        with Locations(Location((40, 60, 0), (0, 0, 180))):
            Circle(SKETCH_27_R)
    extrude(amount=-CUT_EXTRUDE_8_DEPTH, mode=Mode.SUBTRACT)

    # 倒角6
    chamfer_6_edges = [part.edges().sort_by_distance(p)[0] for p in [
        (-47, 60, 42.75),
        (-47, 0, 42.75),
        (-47, -60, 42.75),
        (-47, -60, -42.75),
        (-47, 0, -42.75),
        (-47, 60, -42.75),
    ]]
    chamfer(chamfer_6_edges, length=CHAMFER_6_SIZE)

    # 倒角7
    chamfer_7_edges = [part.edges().sort_by_distance(p)[0] for p in [
        (8, 0, -90),
        (3, 0, -90),
        (-7, 0, -90),
        (-32, 0, -90),
        (-47, 0, -90),
        (-38, 0, -90),
        (-38, 0, 86),
    ]]
    chamfer(chamfer_7_edges, length=CHAMFER_7_SIZE)

    # 草图28 → 切除-拉伸9 (cut)
    with BuildSketch(Plane(origin=(9, 0, 0), x_dir=(0, 0, -1), z_dir=(1, 0, 0))):
        with Locations((0, 19.25)):
            Rectangle(SKETCH_28_W, SKETCH_28_H)
    extrude(amount=-CUT_EXTRUDE_9_DEPTH, mode=Mode.SUBTRACT)


solid = part.part
